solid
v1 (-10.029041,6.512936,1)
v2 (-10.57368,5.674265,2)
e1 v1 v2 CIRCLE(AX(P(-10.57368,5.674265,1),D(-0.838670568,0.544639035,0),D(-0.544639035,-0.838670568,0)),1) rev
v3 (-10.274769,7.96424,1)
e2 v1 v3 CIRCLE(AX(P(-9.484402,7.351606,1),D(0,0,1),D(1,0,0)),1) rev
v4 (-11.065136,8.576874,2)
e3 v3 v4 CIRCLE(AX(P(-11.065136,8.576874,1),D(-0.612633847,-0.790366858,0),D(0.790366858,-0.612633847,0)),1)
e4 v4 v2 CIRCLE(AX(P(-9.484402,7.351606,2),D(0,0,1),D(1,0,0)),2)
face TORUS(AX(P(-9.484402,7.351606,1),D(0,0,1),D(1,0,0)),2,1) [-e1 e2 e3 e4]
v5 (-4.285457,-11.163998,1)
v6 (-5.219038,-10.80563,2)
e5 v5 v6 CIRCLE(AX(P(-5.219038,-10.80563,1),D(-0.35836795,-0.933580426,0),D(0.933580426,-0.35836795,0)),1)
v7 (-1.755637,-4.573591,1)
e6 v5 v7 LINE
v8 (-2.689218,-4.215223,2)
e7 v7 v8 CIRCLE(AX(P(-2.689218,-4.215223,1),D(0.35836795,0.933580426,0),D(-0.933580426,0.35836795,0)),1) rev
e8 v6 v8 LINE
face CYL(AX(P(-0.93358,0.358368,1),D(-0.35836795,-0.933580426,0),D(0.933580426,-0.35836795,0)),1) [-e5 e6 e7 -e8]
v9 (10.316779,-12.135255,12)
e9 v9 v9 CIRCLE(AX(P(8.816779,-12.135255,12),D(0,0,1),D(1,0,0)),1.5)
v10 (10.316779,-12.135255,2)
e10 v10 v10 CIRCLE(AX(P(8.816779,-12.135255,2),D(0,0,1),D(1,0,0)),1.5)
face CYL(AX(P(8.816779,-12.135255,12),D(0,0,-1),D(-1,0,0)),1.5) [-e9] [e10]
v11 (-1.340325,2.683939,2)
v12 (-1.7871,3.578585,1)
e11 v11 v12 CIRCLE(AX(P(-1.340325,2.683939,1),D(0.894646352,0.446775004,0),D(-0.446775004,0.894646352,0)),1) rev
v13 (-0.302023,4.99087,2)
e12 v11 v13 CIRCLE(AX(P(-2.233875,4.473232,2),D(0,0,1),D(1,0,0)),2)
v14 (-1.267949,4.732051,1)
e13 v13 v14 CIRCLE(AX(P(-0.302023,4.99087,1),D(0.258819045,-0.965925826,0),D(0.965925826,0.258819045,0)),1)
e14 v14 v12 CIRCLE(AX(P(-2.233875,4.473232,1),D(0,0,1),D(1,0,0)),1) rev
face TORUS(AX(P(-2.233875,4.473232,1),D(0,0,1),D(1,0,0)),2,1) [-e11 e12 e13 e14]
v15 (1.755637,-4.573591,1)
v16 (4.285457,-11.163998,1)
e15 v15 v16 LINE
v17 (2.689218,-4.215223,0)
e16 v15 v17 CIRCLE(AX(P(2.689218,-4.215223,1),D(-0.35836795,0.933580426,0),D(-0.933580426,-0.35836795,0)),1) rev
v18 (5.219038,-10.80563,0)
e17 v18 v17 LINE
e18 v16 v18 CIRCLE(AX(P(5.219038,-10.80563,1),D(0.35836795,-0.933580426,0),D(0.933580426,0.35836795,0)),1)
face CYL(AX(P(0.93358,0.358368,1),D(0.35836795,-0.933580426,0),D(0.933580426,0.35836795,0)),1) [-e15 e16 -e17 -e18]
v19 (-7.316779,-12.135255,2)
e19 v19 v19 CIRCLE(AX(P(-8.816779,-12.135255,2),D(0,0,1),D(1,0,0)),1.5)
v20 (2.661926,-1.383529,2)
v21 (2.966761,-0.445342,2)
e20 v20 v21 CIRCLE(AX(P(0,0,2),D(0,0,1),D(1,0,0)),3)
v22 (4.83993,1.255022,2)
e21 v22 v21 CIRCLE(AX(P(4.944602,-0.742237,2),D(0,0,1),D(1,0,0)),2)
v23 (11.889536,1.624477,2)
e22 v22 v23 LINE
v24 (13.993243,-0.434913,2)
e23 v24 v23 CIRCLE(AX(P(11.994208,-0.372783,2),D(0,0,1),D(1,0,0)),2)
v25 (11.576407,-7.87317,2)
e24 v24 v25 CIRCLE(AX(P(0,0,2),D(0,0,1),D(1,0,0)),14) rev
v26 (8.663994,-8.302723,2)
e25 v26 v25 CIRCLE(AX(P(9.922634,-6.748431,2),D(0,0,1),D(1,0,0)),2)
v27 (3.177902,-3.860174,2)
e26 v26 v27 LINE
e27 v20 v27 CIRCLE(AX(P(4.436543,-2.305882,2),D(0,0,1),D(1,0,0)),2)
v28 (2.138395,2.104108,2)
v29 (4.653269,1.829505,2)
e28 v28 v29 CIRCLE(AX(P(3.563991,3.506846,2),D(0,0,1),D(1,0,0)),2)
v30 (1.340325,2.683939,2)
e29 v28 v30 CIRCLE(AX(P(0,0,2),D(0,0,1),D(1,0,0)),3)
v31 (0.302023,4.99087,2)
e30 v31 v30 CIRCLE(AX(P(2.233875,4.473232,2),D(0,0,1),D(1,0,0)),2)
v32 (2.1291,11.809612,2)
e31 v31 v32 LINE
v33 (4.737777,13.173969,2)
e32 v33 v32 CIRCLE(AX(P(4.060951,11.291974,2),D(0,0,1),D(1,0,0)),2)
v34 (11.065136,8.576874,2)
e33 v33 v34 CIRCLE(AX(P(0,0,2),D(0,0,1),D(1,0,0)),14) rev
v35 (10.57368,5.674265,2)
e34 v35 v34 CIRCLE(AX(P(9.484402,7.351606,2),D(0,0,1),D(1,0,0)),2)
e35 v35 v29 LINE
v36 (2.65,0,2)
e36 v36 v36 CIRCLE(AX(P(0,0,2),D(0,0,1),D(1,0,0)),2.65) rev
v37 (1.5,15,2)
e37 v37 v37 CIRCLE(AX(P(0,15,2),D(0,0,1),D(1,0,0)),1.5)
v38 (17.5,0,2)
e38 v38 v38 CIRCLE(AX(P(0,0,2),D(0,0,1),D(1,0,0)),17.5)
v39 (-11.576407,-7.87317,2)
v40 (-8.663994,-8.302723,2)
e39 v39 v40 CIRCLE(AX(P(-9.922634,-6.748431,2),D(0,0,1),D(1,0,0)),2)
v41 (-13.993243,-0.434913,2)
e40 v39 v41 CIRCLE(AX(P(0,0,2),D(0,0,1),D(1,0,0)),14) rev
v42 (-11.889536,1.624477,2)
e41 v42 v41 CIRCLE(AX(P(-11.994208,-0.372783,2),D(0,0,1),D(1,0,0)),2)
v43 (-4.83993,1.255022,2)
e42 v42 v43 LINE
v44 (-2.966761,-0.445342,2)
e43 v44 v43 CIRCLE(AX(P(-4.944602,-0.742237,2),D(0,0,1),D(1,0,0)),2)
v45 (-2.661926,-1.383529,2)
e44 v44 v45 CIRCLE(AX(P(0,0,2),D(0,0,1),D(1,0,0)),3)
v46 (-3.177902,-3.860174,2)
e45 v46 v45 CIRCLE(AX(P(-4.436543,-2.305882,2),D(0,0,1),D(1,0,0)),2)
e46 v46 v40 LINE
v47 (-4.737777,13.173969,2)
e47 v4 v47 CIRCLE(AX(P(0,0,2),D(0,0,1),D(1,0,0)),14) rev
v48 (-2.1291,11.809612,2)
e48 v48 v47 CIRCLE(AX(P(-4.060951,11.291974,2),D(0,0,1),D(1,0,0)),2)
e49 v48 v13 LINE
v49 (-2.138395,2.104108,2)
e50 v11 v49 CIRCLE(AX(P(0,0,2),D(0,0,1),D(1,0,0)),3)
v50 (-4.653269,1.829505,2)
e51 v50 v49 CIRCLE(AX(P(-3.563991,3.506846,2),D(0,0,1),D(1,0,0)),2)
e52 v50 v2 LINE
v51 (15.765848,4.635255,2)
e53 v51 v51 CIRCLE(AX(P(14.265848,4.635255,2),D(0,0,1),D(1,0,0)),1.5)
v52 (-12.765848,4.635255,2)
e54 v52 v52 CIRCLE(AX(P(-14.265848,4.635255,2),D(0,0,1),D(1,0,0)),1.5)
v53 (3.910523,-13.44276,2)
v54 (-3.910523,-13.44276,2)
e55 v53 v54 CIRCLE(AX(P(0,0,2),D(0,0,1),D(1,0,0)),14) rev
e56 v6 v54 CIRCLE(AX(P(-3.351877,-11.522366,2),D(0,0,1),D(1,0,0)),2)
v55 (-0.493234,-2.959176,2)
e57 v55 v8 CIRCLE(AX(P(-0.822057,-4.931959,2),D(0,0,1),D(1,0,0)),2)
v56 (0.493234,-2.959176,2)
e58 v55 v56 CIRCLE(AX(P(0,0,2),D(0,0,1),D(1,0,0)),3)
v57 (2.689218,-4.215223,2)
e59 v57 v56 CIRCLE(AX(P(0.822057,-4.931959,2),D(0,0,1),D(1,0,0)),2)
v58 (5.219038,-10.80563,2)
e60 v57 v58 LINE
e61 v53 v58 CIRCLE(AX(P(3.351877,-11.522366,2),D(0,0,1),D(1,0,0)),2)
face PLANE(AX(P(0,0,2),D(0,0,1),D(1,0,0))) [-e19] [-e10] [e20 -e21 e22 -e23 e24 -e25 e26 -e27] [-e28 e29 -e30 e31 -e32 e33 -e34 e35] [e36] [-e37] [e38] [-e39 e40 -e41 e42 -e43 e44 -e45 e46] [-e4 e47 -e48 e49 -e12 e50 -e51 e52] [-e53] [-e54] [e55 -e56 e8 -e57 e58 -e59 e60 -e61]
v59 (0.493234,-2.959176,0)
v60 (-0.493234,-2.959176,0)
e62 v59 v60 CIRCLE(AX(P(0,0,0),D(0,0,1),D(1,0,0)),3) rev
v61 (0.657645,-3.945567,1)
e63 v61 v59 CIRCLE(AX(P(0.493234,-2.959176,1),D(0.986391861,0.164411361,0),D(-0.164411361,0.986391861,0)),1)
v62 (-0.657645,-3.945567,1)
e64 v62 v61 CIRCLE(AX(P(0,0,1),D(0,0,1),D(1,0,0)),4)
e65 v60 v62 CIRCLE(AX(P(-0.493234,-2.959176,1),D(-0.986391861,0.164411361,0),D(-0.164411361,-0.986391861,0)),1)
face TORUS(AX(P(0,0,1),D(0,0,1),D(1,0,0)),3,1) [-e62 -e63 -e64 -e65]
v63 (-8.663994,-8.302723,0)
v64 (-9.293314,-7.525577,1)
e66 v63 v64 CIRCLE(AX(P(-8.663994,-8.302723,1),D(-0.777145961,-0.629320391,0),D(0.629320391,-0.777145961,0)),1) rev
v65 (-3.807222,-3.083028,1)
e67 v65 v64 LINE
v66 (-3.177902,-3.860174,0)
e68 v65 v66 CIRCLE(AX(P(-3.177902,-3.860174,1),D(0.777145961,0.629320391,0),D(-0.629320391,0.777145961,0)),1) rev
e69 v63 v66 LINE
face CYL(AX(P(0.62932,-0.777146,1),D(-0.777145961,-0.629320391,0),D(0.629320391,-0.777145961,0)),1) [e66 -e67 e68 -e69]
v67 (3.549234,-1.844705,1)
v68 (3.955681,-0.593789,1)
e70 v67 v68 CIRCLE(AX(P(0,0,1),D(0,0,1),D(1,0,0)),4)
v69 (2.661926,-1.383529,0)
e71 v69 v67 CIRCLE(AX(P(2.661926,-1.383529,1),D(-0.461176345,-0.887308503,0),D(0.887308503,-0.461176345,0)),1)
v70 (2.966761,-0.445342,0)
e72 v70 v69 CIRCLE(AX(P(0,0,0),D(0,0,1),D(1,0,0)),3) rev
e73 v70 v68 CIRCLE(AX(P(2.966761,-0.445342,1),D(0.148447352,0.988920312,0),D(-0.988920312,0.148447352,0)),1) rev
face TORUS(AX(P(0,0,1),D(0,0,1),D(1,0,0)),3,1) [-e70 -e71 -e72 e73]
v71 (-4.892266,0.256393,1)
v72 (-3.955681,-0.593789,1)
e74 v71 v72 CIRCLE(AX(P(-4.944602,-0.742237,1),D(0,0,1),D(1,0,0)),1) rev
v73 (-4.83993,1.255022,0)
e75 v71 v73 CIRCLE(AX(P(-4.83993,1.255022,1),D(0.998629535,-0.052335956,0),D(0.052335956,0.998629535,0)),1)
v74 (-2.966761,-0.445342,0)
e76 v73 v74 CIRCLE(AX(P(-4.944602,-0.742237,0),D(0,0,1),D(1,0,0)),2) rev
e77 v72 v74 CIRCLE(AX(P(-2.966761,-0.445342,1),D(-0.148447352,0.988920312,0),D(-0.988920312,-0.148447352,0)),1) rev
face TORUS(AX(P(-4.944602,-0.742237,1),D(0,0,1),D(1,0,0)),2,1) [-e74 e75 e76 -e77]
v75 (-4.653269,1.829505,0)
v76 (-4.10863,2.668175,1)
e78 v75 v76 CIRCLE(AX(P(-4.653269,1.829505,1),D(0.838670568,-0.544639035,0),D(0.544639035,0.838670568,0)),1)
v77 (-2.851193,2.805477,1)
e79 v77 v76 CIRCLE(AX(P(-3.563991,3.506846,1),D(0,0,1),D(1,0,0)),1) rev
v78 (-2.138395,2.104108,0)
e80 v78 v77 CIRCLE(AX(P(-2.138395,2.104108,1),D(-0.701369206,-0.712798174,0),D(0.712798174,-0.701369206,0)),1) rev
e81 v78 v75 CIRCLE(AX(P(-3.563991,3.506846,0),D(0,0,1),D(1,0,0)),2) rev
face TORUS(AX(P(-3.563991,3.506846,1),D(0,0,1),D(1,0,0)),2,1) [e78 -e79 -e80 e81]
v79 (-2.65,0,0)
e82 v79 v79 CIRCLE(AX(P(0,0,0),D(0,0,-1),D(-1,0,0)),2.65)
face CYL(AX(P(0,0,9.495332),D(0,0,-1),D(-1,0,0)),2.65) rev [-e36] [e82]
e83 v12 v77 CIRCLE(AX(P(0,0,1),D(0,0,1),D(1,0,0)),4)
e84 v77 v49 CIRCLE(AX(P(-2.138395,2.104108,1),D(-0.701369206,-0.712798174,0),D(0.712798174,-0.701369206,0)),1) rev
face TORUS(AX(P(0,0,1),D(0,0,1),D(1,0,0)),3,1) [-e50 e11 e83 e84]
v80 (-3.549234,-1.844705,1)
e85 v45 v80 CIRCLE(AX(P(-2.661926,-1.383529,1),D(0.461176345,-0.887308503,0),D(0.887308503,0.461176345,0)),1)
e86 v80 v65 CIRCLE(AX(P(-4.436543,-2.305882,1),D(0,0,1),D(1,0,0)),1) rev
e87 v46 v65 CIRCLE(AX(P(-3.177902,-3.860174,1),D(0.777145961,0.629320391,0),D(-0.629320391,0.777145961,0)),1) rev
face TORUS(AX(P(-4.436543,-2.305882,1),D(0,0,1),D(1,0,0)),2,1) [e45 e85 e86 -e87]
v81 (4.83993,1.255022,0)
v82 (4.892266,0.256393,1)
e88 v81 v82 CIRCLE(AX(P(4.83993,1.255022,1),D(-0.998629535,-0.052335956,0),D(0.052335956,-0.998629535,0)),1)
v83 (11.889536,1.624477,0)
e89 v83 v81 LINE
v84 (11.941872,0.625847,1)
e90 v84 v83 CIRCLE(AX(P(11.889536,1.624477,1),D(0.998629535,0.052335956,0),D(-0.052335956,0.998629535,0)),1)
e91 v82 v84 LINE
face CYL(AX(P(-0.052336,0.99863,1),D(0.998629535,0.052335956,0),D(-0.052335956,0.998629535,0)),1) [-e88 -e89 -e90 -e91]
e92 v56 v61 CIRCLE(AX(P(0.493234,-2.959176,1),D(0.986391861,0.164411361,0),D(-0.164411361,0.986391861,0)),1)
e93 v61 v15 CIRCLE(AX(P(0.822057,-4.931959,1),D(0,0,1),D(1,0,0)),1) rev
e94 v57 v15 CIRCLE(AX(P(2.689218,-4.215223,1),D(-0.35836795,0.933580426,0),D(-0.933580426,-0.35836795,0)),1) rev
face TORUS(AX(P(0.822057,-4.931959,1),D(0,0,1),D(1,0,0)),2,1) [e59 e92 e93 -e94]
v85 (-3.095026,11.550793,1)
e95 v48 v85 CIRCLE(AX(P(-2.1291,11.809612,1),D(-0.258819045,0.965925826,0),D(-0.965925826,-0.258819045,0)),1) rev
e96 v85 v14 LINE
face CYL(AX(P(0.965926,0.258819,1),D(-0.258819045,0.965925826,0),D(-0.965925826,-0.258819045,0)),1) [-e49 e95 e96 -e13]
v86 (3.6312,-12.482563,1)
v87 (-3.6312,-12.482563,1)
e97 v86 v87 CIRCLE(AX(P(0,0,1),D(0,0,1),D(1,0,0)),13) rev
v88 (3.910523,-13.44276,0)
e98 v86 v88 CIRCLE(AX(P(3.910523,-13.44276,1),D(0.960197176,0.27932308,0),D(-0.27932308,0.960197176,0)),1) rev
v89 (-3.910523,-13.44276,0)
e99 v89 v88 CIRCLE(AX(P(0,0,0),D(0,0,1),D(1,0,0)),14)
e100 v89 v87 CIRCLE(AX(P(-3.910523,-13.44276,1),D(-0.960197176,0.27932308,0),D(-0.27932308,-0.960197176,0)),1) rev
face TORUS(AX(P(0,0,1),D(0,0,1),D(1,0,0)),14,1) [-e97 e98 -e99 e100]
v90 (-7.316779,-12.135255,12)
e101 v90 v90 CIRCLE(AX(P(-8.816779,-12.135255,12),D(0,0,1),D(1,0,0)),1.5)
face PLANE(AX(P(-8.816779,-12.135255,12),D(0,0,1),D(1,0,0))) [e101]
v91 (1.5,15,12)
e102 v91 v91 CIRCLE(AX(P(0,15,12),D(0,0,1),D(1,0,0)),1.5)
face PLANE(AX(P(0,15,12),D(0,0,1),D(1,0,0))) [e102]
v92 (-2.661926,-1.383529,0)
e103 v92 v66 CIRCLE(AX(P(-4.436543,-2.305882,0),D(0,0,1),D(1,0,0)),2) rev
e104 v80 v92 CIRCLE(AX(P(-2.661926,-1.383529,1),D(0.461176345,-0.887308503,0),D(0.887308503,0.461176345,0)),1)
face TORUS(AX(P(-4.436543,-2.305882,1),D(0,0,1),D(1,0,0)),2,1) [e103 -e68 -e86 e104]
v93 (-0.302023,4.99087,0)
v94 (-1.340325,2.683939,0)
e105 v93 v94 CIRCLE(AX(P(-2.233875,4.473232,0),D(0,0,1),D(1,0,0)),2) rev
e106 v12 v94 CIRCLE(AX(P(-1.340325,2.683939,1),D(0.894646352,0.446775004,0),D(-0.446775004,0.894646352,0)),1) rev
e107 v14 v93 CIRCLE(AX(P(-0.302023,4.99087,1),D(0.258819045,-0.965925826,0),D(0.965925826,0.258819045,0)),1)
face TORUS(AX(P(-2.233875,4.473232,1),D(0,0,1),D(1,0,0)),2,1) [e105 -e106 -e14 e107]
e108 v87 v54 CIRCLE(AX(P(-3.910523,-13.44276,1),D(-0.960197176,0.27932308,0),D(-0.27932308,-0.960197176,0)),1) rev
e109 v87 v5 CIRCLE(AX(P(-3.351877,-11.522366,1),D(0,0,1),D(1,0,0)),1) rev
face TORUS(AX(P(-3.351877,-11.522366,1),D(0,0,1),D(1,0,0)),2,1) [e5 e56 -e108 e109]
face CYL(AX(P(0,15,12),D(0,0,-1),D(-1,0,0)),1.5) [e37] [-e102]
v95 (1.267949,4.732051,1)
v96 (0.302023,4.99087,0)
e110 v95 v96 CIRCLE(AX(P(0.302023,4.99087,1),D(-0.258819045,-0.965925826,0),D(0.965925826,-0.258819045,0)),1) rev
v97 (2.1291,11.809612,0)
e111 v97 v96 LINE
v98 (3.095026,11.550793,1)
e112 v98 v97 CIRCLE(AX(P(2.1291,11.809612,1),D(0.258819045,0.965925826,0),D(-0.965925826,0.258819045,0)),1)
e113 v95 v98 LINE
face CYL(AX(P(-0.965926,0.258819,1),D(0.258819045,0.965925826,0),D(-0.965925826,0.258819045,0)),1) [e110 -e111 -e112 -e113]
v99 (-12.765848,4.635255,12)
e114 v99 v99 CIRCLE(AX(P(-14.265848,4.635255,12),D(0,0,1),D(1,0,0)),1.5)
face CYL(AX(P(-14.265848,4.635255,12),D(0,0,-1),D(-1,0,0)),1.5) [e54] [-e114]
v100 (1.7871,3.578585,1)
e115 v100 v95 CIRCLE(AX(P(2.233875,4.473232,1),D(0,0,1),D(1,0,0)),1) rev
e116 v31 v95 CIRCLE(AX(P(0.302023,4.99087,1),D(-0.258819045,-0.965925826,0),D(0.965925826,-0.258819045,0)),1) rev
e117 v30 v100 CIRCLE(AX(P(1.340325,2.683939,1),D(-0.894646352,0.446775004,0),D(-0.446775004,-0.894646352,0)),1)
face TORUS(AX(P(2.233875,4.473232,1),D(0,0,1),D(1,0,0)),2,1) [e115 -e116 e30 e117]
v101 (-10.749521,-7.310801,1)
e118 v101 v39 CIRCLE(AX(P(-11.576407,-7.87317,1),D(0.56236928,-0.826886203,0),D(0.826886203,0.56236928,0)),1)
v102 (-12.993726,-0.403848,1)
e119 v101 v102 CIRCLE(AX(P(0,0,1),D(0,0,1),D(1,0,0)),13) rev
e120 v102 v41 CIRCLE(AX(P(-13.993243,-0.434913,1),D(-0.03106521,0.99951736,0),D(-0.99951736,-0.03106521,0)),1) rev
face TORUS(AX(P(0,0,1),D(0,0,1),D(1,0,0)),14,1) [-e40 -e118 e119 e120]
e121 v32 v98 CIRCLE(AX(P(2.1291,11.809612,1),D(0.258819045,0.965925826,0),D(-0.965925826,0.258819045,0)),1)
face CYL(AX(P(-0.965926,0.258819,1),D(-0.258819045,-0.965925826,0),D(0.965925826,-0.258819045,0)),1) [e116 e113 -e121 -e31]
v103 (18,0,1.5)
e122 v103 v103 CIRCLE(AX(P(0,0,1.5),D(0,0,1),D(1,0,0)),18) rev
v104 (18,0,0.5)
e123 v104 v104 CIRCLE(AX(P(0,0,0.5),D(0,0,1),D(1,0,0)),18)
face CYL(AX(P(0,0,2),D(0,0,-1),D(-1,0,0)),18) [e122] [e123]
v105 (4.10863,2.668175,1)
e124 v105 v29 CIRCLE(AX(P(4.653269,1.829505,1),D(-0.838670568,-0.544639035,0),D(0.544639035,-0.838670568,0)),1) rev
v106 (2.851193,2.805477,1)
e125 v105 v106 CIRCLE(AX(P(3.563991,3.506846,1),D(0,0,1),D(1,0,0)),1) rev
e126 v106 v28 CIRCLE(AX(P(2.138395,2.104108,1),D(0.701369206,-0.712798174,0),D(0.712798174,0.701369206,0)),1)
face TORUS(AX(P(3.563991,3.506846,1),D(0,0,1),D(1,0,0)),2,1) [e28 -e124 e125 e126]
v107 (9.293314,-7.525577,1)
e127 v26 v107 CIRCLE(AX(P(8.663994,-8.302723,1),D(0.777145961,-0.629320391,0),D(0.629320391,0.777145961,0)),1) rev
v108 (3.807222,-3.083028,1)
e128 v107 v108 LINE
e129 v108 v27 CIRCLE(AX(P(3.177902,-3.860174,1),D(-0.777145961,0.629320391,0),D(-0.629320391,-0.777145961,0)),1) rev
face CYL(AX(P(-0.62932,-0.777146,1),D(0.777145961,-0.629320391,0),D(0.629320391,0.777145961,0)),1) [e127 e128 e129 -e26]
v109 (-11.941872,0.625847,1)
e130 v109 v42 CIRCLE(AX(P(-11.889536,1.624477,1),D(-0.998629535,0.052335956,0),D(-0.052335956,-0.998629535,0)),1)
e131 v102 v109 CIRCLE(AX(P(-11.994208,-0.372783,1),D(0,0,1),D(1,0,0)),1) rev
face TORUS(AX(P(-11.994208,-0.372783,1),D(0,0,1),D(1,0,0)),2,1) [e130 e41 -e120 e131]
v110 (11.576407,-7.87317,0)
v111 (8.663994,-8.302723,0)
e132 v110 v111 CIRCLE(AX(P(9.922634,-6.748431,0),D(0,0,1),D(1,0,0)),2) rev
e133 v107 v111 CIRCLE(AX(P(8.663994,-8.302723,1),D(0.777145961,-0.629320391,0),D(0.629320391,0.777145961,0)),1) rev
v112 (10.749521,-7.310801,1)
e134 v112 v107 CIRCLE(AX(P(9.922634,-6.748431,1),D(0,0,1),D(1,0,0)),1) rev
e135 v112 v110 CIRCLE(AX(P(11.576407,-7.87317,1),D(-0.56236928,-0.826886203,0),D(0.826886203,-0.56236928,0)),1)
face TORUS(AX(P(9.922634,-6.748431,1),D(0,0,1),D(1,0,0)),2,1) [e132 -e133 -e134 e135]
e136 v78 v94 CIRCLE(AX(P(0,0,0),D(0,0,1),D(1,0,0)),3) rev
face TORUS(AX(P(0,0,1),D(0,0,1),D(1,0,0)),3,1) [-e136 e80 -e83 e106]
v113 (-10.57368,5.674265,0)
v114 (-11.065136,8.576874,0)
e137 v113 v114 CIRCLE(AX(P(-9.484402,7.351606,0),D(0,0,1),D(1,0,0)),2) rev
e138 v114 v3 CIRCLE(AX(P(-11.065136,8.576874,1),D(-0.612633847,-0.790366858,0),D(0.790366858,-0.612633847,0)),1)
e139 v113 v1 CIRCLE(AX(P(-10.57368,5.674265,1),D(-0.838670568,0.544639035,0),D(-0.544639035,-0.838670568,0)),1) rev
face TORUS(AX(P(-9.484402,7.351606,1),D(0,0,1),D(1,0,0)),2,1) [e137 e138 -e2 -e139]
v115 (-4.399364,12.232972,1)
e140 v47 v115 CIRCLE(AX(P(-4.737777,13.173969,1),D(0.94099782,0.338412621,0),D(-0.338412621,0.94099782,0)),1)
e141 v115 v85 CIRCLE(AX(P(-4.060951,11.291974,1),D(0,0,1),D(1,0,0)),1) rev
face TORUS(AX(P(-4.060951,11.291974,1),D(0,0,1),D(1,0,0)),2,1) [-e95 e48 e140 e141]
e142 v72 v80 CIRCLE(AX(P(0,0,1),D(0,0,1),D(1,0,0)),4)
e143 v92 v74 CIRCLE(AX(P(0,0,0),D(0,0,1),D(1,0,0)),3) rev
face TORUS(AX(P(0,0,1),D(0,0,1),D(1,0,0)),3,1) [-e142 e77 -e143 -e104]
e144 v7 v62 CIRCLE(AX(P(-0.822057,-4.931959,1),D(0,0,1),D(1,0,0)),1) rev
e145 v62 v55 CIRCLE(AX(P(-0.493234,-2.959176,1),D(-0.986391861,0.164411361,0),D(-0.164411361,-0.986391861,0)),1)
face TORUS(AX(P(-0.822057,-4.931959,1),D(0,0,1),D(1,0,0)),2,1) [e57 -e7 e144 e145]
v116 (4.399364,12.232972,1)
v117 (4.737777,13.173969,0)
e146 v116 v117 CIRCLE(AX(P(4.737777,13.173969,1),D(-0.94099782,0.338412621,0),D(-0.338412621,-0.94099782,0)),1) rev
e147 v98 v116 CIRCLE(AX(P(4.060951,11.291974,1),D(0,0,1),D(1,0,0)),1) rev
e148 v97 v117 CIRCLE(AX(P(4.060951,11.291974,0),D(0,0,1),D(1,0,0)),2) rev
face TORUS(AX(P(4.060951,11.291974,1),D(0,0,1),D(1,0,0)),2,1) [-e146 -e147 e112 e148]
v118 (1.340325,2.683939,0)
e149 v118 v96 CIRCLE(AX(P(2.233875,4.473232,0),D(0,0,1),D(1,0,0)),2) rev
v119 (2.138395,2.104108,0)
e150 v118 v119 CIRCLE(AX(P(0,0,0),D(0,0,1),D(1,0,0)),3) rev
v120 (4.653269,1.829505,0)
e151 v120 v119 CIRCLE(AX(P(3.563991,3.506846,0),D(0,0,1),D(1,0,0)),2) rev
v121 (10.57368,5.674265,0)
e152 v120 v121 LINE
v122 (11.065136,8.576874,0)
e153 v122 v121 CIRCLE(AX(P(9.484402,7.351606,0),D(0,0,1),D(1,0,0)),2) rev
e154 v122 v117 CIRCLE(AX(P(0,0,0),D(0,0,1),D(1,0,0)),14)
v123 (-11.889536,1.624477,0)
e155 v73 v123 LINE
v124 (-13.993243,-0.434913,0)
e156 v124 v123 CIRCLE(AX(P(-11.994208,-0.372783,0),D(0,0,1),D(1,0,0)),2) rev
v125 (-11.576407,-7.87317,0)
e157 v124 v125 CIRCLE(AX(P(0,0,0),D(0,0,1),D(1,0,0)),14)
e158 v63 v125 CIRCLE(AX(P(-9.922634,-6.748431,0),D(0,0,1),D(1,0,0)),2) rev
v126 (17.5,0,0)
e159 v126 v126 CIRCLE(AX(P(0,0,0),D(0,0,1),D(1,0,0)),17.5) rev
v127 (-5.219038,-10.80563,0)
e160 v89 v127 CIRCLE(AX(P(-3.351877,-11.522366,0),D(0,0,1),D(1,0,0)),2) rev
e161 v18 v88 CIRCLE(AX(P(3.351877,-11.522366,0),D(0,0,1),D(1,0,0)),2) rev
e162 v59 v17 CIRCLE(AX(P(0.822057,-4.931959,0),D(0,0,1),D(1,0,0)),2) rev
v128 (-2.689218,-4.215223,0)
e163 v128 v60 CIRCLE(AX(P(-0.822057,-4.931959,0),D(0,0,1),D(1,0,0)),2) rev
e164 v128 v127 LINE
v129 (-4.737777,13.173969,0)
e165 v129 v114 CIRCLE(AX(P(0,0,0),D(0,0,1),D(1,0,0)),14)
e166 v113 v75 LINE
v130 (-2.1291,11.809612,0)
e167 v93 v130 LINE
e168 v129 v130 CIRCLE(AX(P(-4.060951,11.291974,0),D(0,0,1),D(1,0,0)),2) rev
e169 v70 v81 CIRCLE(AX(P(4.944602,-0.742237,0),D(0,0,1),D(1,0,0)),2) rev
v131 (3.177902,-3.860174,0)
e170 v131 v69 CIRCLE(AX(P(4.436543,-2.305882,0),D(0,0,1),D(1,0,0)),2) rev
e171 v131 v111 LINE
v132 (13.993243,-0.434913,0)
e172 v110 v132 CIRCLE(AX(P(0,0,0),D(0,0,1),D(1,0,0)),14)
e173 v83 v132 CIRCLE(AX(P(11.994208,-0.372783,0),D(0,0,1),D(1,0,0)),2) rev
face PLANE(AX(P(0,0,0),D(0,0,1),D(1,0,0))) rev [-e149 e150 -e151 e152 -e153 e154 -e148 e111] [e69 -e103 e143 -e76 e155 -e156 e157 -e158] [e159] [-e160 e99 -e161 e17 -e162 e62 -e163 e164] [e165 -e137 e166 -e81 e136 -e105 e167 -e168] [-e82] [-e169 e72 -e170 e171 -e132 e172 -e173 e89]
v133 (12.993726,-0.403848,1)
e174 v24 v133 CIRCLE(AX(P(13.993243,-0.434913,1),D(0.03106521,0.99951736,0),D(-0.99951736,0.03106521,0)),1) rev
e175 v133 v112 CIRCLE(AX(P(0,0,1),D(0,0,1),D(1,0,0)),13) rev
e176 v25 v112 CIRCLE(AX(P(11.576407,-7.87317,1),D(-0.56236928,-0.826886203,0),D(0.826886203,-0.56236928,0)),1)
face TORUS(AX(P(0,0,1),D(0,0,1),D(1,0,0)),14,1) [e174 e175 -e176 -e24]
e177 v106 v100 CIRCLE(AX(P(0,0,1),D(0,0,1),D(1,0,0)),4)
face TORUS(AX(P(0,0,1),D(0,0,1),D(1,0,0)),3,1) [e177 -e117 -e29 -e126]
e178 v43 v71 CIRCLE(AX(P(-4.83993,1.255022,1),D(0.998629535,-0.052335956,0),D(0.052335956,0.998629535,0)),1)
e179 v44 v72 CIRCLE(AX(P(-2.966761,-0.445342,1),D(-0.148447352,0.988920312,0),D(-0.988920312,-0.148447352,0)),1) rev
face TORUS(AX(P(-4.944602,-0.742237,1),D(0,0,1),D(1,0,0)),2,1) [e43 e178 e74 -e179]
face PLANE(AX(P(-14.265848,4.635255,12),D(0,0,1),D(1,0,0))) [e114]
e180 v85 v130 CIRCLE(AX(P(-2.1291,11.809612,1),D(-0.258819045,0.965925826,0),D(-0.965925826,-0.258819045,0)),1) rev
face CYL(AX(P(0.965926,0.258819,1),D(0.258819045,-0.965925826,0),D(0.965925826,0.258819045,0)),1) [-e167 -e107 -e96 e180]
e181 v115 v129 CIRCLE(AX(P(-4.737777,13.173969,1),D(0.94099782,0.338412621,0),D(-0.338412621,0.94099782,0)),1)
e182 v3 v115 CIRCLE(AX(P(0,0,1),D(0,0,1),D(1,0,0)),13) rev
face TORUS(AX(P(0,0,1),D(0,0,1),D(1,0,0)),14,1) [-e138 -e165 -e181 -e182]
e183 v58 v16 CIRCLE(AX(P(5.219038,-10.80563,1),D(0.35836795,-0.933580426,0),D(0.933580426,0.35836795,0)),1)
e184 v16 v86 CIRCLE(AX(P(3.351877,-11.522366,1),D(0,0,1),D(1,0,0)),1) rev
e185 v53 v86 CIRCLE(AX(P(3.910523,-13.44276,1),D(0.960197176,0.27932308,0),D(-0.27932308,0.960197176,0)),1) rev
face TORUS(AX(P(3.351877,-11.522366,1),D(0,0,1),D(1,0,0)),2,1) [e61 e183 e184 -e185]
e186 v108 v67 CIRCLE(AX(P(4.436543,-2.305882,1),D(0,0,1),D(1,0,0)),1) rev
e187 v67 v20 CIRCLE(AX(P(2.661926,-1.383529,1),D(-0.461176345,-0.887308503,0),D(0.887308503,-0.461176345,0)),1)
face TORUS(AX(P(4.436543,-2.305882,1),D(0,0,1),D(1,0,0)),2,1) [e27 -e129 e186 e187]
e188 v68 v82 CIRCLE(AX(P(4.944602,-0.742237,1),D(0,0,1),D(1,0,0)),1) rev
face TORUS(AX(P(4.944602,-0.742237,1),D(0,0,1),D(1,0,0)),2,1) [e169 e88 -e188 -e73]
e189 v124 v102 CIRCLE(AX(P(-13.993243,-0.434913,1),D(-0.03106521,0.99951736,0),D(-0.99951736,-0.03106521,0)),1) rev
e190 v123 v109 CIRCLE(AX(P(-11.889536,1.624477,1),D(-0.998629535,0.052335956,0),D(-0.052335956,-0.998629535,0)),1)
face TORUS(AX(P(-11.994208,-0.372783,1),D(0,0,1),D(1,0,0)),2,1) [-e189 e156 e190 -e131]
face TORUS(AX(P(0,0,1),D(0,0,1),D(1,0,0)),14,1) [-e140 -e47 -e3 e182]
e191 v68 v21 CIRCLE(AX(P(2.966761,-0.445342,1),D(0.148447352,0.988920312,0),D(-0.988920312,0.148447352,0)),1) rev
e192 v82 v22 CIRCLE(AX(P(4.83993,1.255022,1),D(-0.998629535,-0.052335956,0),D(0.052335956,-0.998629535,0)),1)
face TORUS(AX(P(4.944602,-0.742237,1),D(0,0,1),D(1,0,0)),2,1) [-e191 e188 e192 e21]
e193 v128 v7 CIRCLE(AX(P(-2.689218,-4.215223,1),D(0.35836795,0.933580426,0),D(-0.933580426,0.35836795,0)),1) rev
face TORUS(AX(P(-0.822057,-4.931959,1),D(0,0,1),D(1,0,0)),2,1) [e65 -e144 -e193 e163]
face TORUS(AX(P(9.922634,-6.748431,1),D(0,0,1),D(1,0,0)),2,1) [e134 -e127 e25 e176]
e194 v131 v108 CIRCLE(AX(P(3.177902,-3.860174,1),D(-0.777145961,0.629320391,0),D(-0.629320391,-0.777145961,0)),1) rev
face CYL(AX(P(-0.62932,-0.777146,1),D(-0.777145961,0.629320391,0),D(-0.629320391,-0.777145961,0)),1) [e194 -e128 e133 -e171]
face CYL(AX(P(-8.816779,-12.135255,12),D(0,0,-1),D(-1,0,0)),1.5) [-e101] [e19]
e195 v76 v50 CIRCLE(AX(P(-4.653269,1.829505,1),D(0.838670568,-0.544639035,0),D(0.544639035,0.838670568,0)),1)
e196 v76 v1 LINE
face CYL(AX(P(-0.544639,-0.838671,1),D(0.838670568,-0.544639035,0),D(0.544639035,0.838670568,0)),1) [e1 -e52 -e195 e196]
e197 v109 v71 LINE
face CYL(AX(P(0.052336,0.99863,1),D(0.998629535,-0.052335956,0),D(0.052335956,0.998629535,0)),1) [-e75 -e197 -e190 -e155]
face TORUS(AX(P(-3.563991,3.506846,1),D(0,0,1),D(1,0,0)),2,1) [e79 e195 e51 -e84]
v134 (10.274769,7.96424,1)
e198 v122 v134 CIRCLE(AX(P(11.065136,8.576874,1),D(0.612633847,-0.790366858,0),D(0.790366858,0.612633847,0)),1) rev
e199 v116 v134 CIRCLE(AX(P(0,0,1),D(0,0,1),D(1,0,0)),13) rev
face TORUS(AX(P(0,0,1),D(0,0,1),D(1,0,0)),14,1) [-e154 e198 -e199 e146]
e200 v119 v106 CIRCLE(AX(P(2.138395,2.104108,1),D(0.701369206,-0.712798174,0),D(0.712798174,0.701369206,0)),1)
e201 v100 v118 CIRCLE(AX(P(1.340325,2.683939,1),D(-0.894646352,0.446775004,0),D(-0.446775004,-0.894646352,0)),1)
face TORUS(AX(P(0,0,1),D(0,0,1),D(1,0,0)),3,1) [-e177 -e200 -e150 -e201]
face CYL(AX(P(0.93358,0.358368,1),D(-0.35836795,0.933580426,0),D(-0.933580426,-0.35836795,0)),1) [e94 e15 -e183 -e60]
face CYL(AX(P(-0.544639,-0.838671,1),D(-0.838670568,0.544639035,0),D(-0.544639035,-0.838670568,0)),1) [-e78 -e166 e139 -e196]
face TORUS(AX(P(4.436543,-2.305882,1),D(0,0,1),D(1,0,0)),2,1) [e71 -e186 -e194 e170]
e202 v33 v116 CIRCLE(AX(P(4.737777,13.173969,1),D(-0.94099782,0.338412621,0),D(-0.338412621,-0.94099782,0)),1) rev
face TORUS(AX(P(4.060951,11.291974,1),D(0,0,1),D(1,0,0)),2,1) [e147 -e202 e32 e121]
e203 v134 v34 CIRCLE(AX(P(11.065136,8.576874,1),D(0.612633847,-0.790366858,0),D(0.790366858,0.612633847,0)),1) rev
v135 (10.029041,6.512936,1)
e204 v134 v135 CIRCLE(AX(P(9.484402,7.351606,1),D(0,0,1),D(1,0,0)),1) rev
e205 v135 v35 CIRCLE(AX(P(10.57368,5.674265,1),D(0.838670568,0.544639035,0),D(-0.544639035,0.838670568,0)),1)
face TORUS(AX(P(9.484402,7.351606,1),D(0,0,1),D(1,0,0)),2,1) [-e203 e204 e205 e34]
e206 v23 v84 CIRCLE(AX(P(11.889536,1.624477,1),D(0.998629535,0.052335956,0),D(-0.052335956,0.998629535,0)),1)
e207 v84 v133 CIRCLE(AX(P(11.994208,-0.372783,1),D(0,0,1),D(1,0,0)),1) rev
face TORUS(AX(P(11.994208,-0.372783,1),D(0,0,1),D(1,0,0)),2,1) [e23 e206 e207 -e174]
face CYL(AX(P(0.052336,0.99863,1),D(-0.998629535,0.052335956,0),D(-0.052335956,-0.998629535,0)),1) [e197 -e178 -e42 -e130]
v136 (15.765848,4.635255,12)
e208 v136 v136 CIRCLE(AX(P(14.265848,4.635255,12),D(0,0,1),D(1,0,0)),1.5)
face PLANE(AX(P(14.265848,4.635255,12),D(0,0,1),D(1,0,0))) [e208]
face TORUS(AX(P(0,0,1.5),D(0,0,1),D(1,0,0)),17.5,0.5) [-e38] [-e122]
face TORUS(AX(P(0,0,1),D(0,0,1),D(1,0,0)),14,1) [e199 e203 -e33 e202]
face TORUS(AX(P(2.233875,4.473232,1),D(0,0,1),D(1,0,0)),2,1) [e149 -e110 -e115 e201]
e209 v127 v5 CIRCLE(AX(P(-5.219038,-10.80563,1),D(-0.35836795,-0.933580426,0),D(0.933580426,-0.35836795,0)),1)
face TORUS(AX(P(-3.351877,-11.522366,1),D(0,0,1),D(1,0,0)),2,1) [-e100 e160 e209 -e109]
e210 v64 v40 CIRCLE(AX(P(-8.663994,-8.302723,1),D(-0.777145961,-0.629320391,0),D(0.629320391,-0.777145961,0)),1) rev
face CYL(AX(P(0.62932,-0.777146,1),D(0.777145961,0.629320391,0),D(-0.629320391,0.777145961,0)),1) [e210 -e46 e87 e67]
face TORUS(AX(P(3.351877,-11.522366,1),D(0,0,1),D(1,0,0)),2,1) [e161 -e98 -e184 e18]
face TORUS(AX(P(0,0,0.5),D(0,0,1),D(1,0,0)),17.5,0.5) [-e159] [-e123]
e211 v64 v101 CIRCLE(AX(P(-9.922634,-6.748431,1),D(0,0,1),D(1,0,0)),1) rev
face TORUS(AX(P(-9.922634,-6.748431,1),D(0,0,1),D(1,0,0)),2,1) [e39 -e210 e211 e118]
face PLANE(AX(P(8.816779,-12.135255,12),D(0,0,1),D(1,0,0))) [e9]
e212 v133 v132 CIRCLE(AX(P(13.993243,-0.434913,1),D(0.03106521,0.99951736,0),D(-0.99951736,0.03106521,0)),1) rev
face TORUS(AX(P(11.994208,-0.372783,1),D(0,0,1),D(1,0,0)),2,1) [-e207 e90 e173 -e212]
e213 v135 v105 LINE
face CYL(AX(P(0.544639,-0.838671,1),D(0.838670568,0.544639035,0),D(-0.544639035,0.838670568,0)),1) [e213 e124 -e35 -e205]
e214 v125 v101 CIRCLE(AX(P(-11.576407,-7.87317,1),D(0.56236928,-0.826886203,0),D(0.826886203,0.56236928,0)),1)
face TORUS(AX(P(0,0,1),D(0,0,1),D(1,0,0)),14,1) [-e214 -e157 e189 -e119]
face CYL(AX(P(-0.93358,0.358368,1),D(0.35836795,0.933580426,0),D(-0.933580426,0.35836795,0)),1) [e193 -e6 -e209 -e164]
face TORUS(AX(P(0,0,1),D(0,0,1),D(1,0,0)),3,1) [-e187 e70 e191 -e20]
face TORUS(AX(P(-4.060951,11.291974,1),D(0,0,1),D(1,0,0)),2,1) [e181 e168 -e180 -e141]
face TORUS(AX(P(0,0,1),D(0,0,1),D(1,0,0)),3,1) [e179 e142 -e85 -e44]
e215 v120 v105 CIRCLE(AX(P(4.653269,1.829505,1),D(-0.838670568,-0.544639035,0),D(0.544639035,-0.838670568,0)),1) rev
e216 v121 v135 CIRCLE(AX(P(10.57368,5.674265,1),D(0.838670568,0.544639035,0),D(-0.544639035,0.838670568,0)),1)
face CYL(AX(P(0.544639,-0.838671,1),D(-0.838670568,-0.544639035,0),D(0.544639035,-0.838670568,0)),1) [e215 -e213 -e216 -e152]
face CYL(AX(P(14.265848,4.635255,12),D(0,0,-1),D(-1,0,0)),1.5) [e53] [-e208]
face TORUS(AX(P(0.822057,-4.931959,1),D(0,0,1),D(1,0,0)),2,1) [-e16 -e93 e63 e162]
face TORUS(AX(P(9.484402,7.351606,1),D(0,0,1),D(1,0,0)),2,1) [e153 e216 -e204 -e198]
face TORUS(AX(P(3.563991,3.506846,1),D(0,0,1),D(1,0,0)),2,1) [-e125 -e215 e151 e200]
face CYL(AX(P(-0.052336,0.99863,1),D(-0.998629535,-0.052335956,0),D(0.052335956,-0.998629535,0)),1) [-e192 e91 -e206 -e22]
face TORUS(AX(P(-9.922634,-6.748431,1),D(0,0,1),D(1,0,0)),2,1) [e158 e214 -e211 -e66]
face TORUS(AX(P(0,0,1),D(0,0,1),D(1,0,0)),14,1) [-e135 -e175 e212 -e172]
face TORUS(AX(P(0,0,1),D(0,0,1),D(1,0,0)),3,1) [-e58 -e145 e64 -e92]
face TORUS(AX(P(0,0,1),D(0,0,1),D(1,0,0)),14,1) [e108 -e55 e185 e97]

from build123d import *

# Parameters (mm, degrees)
SKETCH1_R           = 18
BOSS_EXTRUDE1_DEPTH = 2
FILLET1_R           = 1
FILLET2_R           = 0.5
SKETCH2_R           = 1.5
BOSS_EXTRUDE2_DEPTH = 10
SKETCH4_R           = 2.65
CUT_EXTRUDE1_DEPTH  = 2


with BuildPart() as part:
    # Sketch1 → Boss-Extrude1 (new body)
    with BuildSketch(Plane.XY):
        Circle(SKETCH1_R)
        with BuildLine():
            ThreePointArc((-4.658783344, -12.136545544), (0, -13), (4.658783344, -12.136545544))
            Line((4.658783344, -12.136545544), (1.433471798, -3.734321706))
            ThreePointArc((1.433471798, -3.734321706), (0, -4), (-1.433471798, -3.734321706))
            Line((-1.433471798, -3.734321706), (-4.658783344, -12.136545544))
        make_face(mode=Mode.SUBTRACT)
        with BuildLine():
            Line((-3.994518139, 0.209343825), (-12.982183952, 0.680367431))
            ThreePointArc((-12.982183952, 0.680367431), (-12.363734712, -4.017220927), (-10.102897499, -8.181165084))
            Line((-10.102897499, -8.181165084), (-3.108583846, -2.517281564))
            ThreePointArc((-3.108583846, -2.517281564), (-3.804226065, -1.236067977), (-3.994518139, 0.209343825))
        make_face(mode=Mode.SUBTRACT)
        with BuildLine():
            Line((-1.03527618, 3.863703305), (-3.364647586, 12.557035742))
            ThreePointArc((-3.364647586, 12.557035742), (-7.64120828, 10.517220927), (-10.902717383, 7.080307455))
            Line((-10.902717383, 7.080307455), (-3.354682272, 2.17855614))
            ThreePointArc((-3.354682272, 2.17855614), (-2.351141009, 3.236067977), (-1.03527618, 3.863703305))
        make_face(mode=Mode.SUBTRACT)
        with BuildLine():
            Line((3.354682272, 2.17855614), (10.902717383, 7.080307455))
            ThreePointArc((10.902717383, 7.080307455), (7.64120828, 10.517220927), (3.364647586, 12.557035742))
            Line((3.364647586, 12.557035742), (1.03527618, 3.863703305))
            ThreePointArc((1.03527618, 3.863703305), (2.351141009, 3.236067977), (3.354682272, 2.17855614))
        make_face(mode=Mode.SUBTRACT)
        with BuildLine():
            Line((3.108583846, -2.517281564), (10.102897499, -8.181165084))
            ThreePointArc((10.102897499, -8.181165084), (12.363734712, -4.017220927), (12.982183952, 0.680367431))
            Line((12.982183952, 0.680367431), (3.994518139, 0.209343825))
            ThreePointArc((3.994518139, 0.209343825), (3.804226065, -1.236067977), (3.108583846, -2.517281564))
        make_face(mode=Mode.SUBTRACT)
    extrude(amount=BOSS_EXTRUDE1_DEPTH)

    # Fillet1
    fillet1_edges = [part.edges().sort_by_distance(p)[0] for p in [
        (3.804226065, -1.236067977, 2),
        (8.488351045, 0.444855628, 2),
        (0, -13, 2),
        (12.363734712, -4.017220927, 2),
        (-3.046127571, -7.935433625, 2),
        (0, -4, 2),
        (12.363734712, -4.017220927, 0),
        (8.488351045, 0.444855628, 0),
        (3.046127571, -7.935433625, 2),
        (3.804226065, -1.236067977, 0),
        (6.605740672, -5.349223324, 0),
        (7.64120828, 10.517220927, 0),
        (2.199961883, 8.210369523, 0),
        (2.351141009, 3.236067977, 0),
        (7.128699828, 4.629431798, 0),
        (-7.64120828, 10.517220927, 0),
        (-7.128699828, 4.629431798, 0),
        (-2.351141009, 3.236067977, 0),
        (-2.199961883, 8.210369523, 0),
        (-12.363734712, -4.017220927, 0),
        (-6.605740672, -5.349223324, 0),
        (-3.804226065, -1.236067977, 0),
        (-8.488351045, 0.444855628, 0),
        (3.046127571, -7.935433625, 0),
        (0, -4, 0),
        (-3.046127571, -7.935433625, 0),
        (0, -13, 0),
        (-8.488351045, 0.444855628, 2),
        (-3.804226065, -1.236067977, 2),
        (10.102897499, -8.181165084, 1),
        (12.982183952, 0.680367431, 1),
        (3.994518139, 0.209343825, 1),
        (3.108583846, -2.517281564, 1),
        (10.902717383, 7.080307455, 1),
        (3.364647586, 12.557035742, 1),
        (1.03527618, 3.863703305, 1),
        (3.354682272, 2.17855614, 1),
        (-3.364647586, 12.557035742, 1),
        (-10.902717383, 7.080307455, 1),
        (-3.354682272, 2.17855614, 1),
        (-1.03527618, 3.863703305, 1),
        (-12.982183952, 0.680367431, 1),
        (-10.102897499, -8.181165084, 1),
        (-3.108583846, -2.517281564, 1),
        (-3.994518139, 0.209343825, 1),
        (4.658783344, -12.136545544, 1),
        (1.433471798, -3.734321706, 1),
        (-1.433471798, -3.734321706, 1),
        (-4.658783344, -12.136545544, 1),
        (-6.605740672, -5.349223324, 2),
        (-12.363734712, -4.017220927, 2),
        (-2.199961883, 8.210369523, 2),
        (-2.351141009, 3.236067977, 2),
        (-7.128699828, 4.629431798, 2),
        (-7.64120828, 10.517220927, 2),
        (7.128699828, 4.629431798, 2),
        (2.351141009, 3.236067977, 2),
        (2.199961883, 8.210369523, 2),
        (7.64120828, 10.517220927, 2),
        (6.605740672, -5.349223324, 2),
    ]]
    fillet(fillet1_edges, radius=FILLET1_R - 0.0001)  # a hair under: the kernel refuses the full size

    # Fillet2
    fillet2_edges = [part.edges().sort_by_distance(p)[0] for p in [
        (-18, 0, 2),
        (-18, 0, 0),
    ]]
    fillet(fillet2_edges, radius=FILLET2_R)

    # Sketch2 → Boss-Extrude2 (add)
    with BuildSketch(Plane.XY.offset(2)):
        with Locations((0, 15)):
            Circle(SKETCH2_R)
        with Locations((14.265847744, 4.635254916)):
            Circle(SKETCH2_R)
        with Locations((8.816778784, -12.135254916)):
            Circle(SKETCH2_R)
        with Locations((-8.816778784, -12.135254916)):
            Circle(SKETCH2_R)
        with Locations((-14.265847744, 4.635254916)):
            Circle(SKETCH2_R)
    extrude(amount=BOSS_EXTRUDE2_DEPTH)

    # Sketch4 → Cut-Extrude1 (cut)
    with BuildSketch(Plane(origin=(0, 0, 0), x_dir=(-1, 0, 0), z_dir=(0, 0, -1))):
        Circle(SKETCH4_R)
    extrude(amount=-CUT_EXTRUDE1_DEPTH, mode=Mode.SUBTRACT)


solid = part.part
